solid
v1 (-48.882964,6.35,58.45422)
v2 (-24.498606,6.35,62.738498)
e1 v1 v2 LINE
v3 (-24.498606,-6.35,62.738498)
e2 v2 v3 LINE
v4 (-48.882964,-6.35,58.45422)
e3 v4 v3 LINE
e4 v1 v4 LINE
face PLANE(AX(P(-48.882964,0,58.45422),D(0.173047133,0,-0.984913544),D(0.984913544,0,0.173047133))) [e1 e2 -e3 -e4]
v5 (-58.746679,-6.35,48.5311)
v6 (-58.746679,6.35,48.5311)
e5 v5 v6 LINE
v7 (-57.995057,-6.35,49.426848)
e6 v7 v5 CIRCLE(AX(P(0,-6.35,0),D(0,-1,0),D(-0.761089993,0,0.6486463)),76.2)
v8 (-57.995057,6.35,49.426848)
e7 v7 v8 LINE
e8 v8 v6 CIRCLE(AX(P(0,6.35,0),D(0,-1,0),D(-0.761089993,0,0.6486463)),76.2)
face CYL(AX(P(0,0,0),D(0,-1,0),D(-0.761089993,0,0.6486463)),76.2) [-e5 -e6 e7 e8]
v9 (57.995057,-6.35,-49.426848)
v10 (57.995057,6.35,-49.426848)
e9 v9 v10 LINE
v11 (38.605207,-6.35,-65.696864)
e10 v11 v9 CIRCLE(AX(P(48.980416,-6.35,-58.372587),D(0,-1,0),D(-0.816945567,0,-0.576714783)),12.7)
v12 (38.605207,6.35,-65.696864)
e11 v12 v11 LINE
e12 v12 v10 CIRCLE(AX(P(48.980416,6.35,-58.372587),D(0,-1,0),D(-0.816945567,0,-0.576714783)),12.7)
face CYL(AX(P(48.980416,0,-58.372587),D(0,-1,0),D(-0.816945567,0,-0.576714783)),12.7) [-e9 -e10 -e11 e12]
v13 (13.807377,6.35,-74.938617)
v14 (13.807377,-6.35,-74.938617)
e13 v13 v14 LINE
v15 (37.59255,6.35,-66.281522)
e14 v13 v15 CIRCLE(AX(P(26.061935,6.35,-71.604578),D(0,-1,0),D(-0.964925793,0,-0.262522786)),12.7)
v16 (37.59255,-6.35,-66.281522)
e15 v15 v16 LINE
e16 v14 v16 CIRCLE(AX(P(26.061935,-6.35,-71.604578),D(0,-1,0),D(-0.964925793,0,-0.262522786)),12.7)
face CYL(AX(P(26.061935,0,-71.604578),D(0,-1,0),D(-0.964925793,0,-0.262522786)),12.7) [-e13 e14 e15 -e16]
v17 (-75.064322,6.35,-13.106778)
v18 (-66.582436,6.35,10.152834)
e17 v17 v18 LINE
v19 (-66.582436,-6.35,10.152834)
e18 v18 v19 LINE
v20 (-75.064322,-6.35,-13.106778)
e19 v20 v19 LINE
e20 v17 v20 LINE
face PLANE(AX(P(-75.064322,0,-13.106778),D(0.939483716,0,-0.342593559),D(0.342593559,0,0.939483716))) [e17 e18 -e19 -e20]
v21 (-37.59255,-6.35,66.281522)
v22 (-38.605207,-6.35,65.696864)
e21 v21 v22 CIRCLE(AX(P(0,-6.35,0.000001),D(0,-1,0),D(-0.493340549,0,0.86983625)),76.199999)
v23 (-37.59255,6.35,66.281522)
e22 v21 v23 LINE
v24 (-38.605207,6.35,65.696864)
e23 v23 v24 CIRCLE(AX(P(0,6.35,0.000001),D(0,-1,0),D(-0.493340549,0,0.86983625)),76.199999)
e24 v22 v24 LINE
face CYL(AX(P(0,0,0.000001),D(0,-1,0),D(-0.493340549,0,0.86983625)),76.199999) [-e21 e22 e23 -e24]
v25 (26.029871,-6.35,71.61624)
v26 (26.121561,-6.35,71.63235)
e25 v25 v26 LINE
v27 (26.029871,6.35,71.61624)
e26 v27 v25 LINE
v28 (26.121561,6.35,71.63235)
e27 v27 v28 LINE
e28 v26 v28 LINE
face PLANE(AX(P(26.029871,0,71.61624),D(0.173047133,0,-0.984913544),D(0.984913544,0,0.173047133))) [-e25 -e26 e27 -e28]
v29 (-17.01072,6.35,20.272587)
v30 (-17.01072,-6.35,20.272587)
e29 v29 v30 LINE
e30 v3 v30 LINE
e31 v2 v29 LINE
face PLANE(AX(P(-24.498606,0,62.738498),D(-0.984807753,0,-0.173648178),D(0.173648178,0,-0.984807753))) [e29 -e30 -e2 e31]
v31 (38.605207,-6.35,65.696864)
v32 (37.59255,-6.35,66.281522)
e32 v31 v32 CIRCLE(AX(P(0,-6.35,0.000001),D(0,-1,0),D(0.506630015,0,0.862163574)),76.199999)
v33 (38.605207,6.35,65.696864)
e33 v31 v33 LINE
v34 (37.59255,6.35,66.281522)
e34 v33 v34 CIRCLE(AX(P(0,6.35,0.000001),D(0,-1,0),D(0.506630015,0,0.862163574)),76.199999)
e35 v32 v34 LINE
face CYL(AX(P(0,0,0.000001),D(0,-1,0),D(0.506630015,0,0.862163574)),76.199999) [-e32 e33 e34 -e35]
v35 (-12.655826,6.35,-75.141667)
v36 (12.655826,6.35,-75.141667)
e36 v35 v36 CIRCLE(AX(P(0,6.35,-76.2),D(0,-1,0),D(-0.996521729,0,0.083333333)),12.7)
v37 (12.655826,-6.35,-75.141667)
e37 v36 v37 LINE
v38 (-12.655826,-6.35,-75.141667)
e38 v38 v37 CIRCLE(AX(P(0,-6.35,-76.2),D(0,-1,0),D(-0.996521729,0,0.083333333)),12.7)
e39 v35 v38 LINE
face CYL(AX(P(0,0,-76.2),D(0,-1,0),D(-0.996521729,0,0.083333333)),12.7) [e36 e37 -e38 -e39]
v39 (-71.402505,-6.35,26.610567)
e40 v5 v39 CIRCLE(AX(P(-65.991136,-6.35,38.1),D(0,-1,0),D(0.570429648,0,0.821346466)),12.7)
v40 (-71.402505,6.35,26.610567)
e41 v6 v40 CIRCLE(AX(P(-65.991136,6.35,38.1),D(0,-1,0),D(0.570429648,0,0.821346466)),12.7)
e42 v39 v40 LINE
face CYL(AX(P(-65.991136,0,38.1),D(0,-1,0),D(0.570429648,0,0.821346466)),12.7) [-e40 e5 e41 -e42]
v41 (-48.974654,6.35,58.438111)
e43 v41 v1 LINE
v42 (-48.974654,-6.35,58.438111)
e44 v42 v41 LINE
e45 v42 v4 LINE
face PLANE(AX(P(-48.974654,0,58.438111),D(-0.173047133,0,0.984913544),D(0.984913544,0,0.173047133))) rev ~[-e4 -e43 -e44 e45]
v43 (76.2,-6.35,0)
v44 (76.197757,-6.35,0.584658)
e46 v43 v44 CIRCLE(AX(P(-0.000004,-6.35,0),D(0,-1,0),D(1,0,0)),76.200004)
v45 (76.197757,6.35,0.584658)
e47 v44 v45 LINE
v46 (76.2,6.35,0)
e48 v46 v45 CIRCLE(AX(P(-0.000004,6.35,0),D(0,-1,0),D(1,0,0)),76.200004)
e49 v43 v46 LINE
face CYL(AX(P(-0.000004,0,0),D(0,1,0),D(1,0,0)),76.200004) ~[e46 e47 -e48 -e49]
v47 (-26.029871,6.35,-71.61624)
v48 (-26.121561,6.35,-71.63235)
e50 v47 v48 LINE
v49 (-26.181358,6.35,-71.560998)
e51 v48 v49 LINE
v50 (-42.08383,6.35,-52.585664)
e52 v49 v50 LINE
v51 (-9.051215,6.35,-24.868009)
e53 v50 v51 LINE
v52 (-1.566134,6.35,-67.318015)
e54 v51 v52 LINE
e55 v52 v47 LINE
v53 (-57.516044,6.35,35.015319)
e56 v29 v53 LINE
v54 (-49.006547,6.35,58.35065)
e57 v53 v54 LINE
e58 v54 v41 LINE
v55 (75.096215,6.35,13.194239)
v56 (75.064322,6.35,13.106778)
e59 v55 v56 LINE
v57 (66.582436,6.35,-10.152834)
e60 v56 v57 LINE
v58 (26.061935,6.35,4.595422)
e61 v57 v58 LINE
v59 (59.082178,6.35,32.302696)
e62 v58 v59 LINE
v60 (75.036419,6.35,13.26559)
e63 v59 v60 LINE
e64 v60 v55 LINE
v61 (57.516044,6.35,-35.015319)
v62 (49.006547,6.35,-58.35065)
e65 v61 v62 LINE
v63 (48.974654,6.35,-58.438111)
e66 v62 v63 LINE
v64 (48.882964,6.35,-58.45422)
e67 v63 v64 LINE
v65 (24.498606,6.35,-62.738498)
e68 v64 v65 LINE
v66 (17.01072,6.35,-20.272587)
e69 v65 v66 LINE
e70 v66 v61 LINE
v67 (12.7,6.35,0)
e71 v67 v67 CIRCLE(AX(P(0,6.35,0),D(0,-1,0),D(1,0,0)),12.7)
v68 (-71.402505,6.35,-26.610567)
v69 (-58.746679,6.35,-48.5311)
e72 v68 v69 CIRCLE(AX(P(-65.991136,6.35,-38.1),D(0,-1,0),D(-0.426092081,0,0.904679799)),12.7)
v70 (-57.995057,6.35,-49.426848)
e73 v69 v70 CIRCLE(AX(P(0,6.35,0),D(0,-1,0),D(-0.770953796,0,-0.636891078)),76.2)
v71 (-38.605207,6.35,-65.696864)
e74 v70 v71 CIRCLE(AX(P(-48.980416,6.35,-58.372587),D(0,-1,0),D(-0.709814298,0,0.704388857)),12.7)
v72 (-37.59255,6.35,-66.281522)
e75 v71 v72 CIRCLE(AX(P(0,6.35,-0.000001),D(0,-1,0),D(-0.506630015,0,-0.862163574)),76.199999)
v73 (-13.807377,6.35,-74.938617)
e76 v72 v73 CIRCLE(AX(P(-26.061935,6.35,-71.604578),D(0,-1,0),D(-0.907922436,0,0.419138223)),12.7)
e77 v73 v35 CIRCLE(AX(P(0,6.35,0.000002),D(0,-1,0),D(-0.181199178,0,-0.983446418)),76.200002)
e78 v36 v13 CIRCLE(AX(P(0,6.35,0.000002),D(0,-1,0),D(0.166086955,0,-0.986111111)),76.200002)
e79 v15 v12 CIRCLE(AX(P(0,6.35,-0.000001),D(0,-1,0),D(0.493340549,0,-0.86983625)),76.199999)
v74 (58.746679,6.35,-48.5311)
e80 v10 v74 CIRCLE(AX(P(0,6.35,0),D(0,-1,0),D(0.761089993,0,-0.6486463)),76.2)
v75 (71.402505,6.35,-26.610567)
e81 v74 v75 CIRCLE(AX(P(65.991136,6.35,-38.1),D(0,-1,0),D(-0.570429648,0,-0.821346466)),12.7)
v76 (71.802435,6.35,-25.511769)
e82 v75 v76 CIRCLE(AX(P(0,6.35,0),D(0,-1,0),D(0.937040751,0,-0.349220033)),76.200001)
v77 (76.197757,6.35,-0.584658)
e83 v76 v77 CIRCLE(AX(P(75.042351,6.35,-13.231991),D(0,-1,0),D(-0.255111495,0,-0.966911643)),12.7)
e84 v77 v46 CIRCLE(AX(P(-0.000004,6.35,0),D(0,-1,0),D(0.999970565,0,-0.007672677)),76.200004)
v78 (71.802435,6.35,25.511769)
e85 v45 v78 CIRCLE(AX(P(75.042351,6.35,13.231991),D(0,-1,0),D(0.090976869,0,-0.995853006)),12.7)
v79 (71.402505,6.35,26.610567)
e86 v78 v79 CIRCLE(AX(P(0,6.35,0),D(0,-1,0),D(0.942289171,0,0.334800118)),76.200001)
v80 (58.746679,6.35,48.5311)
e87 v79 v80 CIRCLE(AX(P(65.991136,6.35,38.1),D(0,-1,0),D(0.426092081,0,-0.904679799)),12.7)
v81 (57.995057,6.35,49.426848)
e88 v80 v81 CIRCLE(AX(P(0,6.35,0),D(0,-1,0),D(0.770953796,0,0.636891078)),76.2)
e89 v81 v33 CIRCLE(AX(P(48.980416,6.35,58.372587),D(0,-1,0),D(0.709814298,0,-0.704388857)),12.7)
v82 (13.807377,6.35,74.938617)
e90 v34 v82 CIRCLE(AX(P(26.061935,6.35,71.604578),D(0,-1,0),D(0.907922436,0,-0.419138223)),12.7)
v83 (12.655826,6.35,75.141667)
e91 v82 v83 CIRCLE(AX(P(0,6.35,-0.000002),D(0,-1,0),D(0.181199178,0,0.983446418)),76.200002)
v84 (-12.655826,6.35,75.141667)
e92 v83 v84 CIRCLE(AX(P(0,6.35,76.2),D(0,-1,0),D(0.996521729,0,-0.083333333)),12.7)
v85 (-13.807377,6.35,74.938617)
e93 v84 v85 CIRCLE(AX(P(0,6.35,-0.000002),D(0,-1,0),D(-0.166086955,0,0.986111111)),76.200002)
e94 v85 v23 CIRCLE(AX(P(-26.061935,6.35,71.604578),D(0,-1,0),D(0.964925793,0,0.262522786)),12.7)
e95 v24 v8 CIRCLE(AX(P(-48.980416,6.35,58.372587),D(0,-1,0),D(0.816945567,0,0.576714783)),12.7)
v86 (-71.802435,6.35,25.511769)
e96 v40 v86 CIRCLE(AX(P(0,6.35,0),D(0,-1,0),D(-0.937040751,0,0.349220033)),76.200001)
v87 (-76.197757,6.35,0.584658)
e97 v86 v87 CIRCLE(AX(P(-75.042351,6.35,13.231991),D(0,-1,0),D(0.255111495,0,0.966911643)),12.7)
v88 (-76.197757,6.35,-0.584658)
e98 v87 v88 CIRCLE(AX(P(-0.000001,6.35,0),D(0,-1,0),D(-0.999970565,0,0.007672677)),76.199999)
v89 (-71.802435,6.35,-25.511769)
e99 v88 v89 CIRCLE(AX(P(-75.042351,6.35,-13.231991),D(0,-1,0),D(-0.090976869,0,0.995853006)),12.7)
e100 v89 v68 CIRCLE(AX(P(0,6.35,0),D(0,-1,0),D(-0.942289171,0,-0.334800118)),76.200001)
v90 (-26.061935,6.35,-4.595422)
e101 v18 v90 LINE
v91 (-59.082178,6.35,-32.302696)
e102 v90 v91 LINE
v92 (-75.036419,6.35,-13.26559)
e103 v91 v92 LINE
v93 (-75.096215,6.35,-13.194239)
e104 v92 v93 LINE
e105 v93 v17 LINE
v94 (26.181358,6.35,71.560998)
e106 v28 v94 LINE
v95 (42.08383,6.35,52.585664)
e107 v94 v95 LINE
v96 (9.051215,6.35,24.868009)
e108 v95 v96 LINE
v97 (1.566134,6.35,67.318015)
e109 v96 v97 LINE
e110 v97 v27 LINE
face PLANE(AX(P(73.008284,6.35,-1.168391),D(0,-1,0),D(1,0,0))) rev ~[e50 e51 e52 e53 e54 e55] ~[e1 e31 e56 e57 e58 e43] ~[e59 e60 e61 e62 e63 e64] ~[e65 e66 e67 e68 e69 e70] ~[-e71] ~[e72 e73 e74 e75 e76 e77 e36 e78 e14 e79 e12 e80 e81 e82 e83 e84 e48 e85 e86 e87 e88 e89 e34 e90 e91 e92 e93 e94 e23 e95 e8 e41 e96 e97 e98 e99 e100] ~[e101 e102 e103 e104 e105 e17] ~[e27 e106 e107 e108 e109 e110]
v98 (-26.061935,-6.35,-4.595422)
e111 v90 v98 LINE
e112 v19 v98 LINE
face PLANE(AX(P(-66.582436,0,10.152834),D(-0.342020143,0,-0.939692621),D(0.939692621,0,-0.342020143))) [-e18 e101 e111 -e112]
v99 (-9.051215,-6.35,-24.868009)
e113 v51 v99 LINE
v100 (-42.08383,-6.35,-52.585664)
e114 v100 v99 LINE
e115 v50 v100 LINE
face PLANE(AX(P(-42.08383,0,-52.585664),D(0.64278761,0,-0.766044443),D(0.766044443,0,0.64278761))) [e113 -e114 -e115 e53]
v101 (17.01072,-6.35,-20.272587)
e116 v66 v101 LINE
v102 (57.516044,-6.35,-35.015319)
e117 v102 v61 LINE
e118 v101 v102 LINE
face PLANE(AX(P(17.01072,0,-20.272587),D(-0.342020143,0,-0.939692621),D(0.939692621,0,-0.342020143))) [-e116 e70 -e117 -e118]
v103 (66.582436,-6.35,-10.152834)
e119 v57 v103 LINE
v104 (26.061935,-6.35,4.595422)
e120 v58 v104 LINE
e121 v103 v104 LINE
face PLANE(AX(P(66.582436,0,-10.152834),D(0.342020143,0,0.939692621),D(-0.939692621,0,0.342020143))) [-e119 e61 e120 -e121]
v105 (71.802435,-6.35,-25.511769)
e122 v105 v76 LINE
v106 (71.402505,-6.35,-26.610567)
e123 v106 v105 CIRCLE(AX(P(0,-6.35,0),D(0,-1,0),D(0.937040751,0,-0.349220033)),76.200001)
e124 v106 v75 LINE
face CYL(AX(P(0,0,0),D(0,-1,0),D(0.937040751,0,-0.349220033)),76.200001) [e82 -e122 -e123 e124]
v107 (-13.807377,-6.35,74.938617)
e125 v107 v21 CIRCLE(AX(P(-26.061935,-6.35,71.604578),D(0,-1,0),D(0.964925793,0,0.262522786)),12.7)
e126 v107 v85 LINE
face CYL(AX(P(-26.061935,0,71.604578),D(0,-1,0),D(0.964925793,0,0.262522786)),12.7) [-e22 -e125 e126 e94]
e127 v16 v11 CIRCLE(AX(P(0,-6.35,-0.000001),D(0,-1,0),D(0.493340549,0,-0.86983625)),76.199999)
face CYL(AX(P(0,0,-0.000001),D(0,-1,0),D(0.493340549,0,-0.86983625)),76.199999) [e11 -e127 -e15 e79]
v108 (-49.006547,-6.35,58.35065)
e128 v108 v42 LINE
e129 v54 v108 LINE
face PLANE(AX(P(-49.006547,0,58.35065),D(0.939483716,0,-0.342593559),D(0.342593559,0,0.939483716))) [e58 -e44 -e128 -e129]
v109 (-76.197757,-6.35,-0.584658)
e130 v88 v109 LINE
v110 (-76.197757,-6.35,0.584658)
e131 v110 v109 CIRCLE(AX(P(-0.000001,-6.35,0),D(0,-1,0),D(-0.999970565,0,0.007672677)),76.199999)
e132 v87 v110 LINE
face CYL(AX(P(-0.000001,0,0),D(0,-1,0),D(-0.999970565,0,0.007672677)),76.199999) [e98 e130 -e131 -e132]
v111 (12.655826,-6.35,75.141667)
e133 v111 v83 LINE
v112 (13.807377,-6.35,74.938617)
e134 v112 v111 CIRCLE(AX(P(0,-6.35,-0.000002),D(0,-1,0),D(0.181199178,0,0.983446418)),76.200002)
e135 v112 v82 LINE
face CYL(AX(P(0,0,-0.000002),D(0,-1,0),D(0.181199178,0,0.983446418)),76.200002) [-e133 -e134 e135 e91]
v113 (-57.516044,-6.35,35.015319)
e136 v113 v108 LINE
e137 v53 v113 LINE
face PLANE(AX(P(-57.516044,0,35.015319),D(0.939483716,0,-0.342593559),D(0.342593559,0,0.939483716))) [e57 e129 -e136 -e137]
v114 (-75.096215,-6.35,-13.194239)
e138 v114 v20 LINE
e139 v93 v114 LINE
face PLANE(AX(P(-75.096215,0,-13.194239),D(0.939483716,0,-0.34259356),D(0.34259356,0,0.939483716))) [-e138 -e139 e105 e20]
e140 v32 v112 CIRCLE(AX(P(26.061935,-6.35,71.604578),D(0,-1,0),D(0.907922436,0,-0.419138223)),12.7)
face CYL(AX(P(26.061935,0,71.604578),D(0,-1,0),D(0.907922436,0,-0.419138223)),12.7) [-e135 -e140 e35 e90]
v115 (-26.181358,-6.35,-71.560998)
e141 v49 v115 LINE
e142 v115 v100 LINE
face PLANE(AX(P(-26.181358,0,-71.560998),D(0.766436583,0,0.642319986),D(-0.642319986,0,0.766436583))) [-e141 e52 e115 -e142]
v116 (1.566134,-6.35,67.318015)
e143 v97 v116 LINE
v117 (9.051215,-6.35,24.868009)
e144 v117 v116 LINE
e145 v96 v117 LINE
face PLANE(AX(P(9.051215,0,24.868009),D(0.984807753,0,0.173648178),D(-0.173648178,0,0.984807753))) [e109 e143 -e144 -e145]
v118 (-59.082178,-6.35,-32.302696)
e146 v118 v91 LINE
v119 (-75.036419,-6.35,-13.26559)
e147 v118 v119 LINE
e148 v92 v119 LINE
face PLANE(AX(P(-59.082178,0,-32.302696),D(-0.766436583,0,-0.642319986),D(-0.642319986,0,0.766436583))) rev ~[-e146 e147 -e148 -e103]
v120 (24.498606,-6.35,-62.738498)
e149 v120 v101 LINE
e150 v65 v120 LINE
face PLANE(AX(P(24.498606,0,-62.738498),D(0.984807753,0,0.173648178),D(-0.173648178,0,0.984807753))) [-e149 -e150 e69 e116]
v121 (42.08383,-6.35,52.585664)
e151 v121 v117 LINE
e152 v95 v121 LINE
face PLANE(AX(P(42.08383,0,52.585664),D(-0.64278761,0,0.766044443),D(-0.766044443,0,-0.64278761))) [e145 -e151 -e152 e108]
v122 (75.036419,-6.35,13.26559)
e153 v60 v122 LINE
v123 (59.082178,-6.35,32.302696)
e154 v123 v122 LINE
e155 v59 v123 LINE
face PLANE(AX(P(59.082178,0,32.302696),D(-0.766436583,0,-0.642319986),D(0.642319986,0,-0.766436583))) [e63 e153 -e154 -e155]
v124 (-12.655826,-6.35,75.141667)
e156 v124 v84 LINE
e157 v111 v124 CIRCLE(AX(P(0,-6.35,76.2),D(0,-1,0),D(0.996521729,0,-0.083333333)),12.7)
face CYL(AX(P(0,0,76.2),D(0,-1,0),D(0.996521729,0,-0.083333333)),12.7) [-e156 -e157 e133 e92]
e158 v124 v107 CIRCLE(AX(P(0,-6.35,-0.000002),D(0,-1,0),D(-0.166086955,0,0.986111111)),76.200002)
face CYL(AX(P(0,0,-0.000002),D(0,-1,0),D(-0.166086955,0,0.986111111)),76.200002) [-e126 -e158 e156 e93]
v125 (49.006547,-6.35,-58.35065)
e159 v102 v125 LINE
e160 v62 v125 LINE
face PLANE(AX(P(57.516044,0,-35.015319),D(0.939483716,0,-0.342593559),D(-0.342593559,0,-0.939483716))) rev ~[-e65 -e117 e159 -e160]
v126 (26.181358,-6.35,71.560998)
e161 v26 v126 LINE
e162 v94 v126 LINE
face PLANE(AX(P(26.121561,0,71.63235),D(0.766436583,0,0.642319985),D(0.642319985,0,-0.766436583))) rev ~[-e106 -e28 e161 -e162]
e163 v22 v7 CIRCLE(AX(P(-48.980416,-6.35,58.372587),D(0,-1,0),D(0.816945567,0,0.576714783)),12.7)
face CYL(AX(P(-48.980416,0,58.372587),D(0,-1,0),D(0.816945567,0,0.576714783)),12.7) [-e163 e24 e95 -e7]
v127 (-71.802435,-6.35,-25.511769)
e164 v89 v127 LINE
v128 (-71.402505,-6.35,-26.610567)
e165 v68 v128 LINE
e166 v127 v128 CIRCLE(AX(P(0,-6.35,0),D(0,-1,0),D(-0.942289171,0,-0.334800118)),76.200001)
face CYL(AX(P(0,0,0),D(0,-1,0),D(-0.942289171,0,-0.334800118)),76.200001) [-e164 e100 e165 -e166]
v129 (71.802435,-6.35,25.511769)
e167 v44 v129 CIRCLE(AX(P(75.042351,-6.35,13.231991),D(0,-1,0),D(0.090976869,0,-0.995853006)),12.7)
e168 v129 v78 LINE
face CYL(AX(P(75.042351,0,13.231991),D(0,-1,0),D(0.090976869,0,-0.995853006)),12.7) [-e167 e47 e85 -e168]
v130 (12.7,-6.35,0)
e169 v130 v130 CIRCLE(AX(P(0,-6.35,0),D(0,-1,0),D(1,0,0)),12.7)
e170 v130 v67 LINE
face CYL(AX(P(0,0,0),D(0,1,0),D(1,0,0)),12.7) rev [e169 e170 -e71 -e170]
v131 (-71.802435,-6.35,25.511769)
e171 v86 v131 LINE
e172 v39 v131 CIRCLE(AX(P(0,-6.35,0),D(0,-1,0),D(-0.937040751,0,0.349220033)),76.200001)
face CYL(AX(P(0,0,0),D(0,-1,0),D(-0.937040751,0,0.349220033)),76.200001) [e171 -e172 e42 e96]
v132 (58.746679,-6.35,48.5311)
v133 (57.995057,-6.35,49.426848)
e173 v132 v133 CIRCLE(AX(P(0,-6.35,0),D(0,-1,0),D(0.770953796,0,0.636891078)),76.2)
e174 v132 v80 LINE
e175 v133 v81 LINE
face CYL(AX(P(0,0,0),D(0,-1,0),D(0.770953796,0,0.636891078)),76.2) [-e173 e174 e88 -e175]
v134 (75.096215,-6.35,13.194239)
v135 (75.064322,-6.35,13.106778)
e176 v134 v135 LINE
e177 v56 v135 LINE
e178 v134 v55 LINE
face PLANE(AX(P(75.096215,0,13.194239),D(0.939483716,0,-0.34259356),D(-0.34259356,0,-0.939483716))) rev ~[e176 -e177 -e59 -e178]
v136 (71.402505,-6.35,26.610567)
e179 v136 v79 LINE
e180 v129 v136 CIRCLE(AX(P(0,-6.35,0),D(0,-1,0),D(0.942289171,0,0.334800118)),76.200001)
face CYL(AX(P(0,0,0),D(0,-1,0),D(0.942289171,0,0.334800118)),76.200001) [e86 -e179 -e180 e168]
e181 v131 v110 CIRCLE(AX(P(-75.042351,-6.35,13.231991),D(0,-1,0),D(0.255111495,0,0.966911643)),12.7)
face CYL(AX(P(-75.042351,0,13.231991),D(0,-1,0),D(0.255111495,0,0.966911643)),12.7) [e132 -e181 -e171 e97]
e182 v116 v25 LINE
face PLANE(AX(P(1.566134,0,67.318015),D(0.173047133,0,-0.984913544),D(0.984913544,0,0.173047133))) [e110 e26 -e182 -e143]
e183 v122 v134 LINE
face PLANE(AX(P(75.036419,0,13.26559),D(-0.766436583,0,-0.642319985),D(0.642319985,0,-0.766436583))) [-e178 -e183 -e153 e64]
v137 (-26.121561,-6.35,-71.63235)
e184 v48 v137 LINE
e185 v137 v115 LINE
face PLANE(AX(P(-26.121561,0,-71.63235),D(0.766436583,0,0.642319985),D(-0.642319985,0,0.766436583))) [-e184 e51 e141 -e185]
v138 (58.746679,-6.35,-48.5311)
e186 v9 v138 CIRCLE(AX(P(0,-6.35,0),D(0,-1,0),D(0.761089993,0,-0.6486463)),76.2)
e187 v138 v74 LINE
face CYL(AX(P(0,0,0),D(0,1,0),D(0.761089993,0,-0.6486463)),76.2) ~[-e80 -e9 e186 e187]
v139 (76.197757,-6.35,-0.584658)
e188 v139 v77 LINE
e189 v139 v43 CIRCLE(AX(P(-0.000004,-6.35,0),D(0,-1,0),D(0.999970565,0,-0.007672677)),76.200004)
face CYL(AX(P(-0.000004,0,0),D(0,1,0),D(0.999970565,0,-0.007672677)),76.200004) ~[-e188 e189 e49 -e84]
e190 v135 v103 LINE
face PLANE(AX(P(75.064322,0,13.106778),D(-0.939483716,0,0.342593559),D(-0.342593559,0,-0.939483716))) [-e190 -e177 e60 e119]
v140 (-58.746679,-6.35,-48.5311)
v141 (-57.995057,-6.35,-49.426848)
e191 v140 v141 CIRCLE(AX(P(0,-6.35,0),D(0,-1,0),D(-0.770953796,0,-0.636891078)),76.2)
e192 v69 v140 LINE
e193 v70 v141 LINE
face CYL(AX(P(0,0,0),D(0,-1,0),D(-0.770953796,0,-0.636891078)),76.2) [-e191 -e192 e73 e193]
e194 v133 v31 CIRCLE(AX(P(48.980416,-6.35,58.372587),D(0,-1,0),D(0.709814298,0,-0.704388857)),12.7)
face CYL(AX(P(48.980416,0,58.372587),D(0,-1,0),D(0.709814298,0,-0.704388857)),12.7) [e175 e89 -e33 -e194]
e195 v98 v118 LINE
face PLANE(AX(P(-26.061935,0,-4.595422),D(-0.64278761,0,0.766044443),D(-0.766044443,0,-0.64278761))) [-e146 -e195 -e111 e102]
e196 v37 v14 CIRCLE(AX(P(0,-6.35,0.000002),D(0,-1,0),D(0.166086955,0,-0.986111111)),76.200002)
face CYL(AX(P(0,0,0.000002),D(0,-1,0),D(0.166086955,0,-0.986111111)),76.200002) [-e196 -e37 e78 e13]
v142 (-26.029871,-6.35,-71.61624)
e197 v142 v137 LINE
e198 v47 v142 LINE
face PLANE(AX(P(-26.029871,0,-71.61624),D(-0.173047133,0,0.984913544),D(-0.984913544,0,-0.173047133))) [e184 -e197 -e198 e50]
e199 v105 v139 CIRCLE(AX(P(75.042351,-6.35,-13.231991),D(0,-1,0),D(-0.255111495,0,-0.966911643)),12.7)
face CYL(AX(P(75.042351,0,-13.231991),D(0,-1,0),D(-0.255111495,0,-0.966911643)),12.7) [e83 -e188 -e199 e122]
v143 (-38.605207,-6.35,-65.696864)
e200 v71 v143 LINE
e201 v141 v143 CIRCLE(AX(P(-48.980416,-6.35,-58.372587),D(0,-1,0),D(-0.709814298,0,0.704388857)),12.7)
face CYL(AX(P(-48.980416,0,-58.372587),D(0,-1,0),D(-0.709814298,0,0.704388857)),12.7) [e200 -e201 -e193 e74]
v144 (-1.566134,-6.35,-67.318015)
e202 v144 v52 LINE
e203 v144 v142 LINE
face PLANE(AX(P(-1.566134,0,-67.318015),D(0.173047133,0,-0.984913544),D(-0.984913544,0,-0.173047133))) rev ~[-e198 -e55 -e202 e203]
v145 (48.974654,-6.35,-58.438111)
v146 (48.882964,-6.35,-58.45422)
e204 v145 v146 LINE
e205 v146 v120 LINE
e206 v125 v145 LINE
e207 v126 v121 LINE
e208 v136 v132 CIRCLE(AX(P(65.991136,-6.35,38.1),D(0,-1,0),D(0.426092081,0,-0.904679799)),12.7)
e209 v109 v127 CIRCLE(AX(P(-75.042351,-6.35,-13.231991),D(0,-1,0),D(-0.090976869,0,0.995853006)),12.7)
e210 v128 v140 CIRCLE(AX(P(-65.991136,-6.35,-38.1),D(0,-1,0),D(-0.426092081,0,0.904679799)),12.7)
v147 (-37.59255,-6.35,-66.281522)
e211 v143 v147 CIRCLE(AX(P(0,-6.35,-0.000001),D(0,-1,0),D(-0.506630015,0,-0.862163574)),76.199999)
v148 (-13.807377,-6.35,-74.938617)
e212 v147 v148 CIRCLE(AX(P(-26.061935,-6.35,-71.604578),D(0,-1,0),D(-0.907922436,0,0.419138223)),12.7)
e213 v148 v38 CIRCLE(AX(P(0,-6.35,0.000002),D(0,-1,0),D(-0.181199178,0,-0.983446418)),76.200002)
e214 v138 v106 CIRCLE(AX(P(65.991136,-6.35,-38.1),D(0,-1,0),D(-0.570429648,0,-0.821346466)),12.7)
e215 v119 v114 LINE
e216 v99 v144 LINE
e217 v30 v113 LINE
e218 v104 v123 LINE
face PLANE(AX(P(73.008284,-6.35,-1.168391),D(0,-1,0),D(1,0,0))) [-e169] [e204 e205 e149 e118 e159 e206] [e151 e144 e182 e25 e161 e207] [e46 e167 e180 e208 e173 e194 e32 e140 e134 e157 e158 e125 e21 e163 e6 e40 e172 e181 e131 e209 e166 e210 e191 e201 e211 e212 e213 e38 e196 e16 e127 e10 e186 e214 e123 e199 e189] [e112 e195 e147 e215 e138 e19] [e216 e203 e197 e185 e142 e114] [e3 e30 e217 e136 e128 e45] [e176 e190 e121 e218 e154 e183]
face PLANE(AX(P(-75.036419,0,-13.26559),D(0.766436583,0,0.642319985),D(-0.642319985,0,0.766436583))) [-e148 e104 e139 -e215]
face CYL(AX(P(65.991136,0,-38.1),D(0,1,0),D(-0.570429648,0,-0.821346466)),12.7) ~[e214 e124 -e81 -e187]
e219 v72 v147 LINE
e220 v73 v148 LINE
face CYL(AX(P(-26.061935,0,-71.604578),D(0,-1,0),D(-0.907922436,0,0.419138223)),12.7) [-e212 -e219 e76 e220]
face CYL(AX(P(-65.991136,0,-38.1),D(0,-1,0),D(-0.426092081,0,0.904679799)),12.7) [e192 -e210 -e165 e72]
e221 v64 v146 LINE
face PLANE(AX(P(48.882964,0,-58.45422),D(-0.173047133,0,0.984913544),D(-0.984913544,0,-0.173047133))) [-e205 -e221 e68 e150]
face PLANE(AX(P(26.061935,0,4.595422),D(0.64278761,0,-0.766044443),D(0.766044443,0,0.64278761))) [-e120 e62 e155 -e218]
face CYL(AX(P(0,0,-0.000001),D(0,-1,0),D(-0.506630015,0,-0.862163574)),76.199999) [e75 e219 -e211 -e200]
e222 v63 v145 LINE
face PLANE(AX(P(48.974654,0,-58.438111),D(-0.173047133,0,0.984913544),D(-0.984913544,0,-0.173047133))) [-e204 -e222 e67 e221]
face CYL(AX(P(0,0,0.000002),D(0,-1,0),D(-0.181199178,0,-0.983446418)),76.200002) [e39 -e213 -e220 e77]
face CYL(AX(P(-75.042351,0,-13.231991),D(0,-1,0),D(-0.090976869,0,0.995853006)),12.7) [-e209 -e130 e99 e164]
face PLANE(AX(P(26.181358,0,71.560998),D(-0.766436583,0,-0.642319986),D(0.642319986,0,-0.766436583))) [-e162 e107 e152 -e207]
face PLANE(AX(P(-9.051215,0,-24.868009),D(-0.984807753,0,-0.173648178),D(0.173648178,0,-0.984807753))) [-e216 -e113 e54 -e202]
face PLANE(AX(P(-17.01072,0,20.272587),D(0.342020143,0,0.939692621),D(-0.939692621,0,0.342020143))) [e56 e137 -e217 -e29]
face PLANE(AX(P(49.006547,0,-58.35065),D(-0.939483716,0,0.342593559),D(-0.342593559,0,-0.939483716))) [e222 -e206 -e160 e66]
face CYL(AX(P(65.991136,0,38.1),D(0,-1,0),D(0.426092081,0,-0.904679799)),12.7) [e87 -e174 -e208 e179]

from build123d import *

# Parameters (mm, degrees)
F0_R     = 12.7
F1_DEPTH = 6.35


with BuildPart() as f1:
    # F0 (on Front) → F1 (new body, symmetric)
    with BuildSketch(Plane.XZ):
        with BuildLine():
            ThreePointArc((76.1977570212, -0.5846579641), (76.1994392532, -0.2923311333), (76.2, 0))
            ThreePointArc((76.2, 0), (76.1994392532, 0.2923311333), (76.1977570212, 0.5846579641))
            ThreePointArc((76.1977570212, 0.5846579641), (75.8897554045, 6.8691356552), (75.0643215302, 13.1067781397))
            Line((75.0643215302, 13.1067781397), (66.5824360485, -10.1528339917))
            Line((66.5824360485, -10.1528339917), (75.0423507795, -13.2319911382))
            ThreePointArc((75.0423507795, -13.2319911382), (75.8839990446, -6.9324374501), (76.1977570212, -0.5846579641))
        make_face()
        with BuildLine():
            ThreePointArc((75.0643215302, 13.1067781397), (75.8897554045, 6.8691356552), (76.1977570212, 0.5846579641))
            ThreePointArc((76.1977570212, 0.5846579641), (87.5494092428, 15.4373229946), (71.802434794, 25.5117690029))
            ThreePointArc((71.802434794, 25.5117690029), (73.6743133021, 19.4559903234), (75.0364186026, 13.2655901978))
            Line((75.0364186026, 13.2655901978), (75.0962151587, 13.1942390501))
            Line((75.0962151587, 13.1942390501), (75.0643215302, 13.1067781397))
        make_face()
        with BuildLine():
            ThreePointArc((71.802434794, -25.5117690029), (87.5494092428, -15.4373229946), (76.1977570212, -0.5846579641))
            ThreePointArc((76.1977570212, -0.5846579641), (75.8839990446, -6.9324374501), (75.0423507795, -13.2319911382))
            ThreePointArc((75.0423507795, -13.2319911382), (73.6786671882, -19.4394959134), (71.802434794, -25.5117690029))
        make_face()
        with BuildLine():
            ThreePointArc((75.0364186026, 13.2655901978), (73.6743133021, 19.4559903234), (71.802434794, 25.5117690029))
            ThreePointArc((71.802434794, 25.5117690029), (71.6045777039, 26.0619349214), (71.4025051926, 26.6105665521))
            ThreePointArc((71.4025051926, 26.6105665521), (68.9366006876, 32.4682165453), (65.9911357684, 38.1))
            Line((65.9911357684, 38.1), (59.08217806, 32.3026961351))
            Line((59.08217806, 32.3026961351), (75.0364186026, 13.2655901978))
        make_face()
        with BuildLine():
            ThreePointArc((71.802434794, -25.5117690029), (73.6786671882, -19.4394959134), (75.0423507795, -13.2319911382))
            Line((75.0423507795, -13.2319911382), (66.5824360485, -10.1528339917))
            Line((66.5824360485, -10.1528339917), (57.5160444937, -35.0153190433))
            Line((57.5160444937, -35.0153190433), (65.9911357684, -38.1))
            ThreePointArc((65.9911357684, -38.1), (68.9366006876, -32.4682165453), (71.4025051926, -26.6105665521))
            ThreePointArc((71.4025051926, -26.6105665521), (71.6045777039, -26.0619349214), (71.802434794, -25.5117690029))
        make_face()
        Polygon((57.5160444937, -35.0153190433), (66.5824360485, -10.1528339917), (26.0619349214, 4.5954222961), (59.08217806, 32.3026961351), (42.0838301815, 52.585664068), (9.0512150112, 24.8680088618), (1.5661335663, 67.3180151784), (-24.498605867, 62.7384980597), (-17.0107199103, 20.2725865657), (-57.5160444937, 35.0153190433), (-66.5824360485, 10.1528339917), (-26.0619349214, -4.5954222961), (-59.08217806, -32.3026961351), (-42.0838301815, -52.585664068), (-9.0512150112, -24.8680088618), (-1.5661335663, -67.3180151784), (24.498605867, -62.7384980597), (17.0107199103, -20.2725865657), align=None)
        Polygon((9.1694975967, 24.5029696394), (25.8049429742, 4.310466961), (16.6354453775, -20.1925026784), (-9.1694975967, -24.5029696394), (-25.8049429742, -4.310466961), (-16.6354453775, 20.1925026784), align=None, mode=Mode.SUBTRACT)
        with BuildLine():
            ThreePointArc((65.9911357684, 38.1), (68.9366006876, 32.4682165453), (71.4025051926, 26.6105665521))
            ThreePointArc((71.4025051926, 26.6105665521), (76.9896583964, 44.45), (58.7466792395, 48.5311001146))
            ThreePointArc((58.7466792395, 48.5311001146), (62.5866006876, 43.4667391734), (65.9911357684, 38.1))
        make_face()
        with BuildLine():
            ThreePointArc((58.7466792395, -48.5311001146), (76.9896583964, -44.45), (71.4025051926, -26.6105665521))
            ThreePointArc((71.4025051926, -26.6105665521), (68.9366006876, -32.4682165453), (65.9911357684, -38.1))
            ThreePointArc((65.9911357684, -38.1), (62.5866006876, -43.4667391734), (58.7466792395, -48.5311001146))
        make_face()
        with BuildLine():
            Line((42.0838301815, 52.585664068), (59.08217806, 32.3026961351))
            Line((59.08217806, 32.3026961351), (65.9911357684, 38.1))
            ThreePointArc((65.9911357684, 38.1), (62.5866006876, 43.4667391734), (58.7466792395, 48.5311001146))
            ThreePointArc((58.7466792395, 48.5311001146), (58.3725865657, 48.9804158581), (57.995057449, 49.4268480837))
            ThreePointArc((57.995057449, 49.4268480837), (53.6744308919, 54.0878495453), (48.9804158581, 58.3725865657))
            Line((48.9804158581, 58.3725865657), (42.0838301815, 52.585664068))
        make_face()
        with BuildLine():
            Line((65.9911357684, -38.1), (57.5160444937, -35.0153190433))
            Line((57.5160444937, -35.0153190433), (49.0065474088, -58.35064962))
            ThreePointArc((49.0065474088, -58.35064962), (53.6865385269, -54.0758317643), (57.995057449, -49.4268480837))
            ThreePointArc((57.995057449, -49.4268480837), (58.3725865657, -48.9804158581), (58.7466792395, -48.5311001146))
            ThreePointArc((58.7466792395, -48.5311001146), (62.5866006876, -43.4667391734), (65.9911357684, -38.1))
        make_face()
        with BuildLine():
            Line((26.1813579343, 71.5609984329), (42.0838301815, 52.585664068))
            Line((42.0838301815, 52.585664068), (48.9804158581, 58.3725865657))
            ThreePointArc((48.9804158581, 58.3725865657), (43.9456664643, 62.2512521883), (38.6052071601, 65.6968643097))
            ThreePointArc((38.6052071601, 65.6968643097), (38.1, 65.9911357684), (37.5925498612, 66.2815222738))
            ThreePointArc((37.5925498612, 66.2815222738), (31.9960317228, 69.1570238949), (26.1813579343, 71.5609984329))
        make_face()
        with BuildLine():
            ThreePointArc((57.995057449, -49.4268480837), (53.6865385269, -54.0758317643), (49.0065474088, -58.35064962))
            Line((49.0065474088, -58.35064962), (48.9746537804, -58.4381105304))
            Line((48.9746537804, -58.4381105304), (48.8829635959, -58.4542202932))
            ThreePointArc((48.8829635959, -58.4542202932), (43.8937236817, -62.2878882397), (38.6052071601, -65.6968643097))
            ThreePointArc((38.6052071601, -65.6968643097), (57.1438185011, -68.1013509933), (57.995057449, -49.4268480837))
        make_face()
        with BuildLine():
            ThreePointArc((48.9804158581, 58.3725865657), (53.6744308919, 54.0878495453), (57.995057449, 49.4268480837))
            ThreePointArc((57.995057449, 49.4268480837), (57.1438185011, 68.1013509933), (38.6052071601, 65.6968643097))
            ThreePointArc((38.6052071601, 65.6968643097), (43.9456664643, 62.2512521883), (48.9804158581, 58.3725865657))
        make_face()
        with BuildLine():
            Line((26.1215613783, 71.6323495805), (26.1813579343, 71.5609984329))
            ThreePointArc((26.1813579343, 71.5609984329), (31.9960317228, 69.1570238949), (37.5925498612, 66.2815222738))
            ThreePointArc((37.5925498612, 66.2815222738), (30.4055907417, 83.5386739879), (13.807377345, 74.9386170866))
            ThreePointArc((13.807377345, 74.9386170866), (19.9877747752, 73.5318220877), (26.0298711938, 71.6162398177))
            Line((26.0298711938, 71.6162398177), (26.1215613783, 71.6323495805))
        make_face()
        with BuildLine():
            ThreePointArc((38.6052071601, -65.6968643097), (43.8937236817, -62.2878882397), (48.8829635959, -58.4542202932))
            Line((48.8829635959, -58.4542202932), (24.498605867, -62.7384980597))
            Line((24.498605867, -62.7384980597), (26.0619349214, -71.6045777039))
            ThreePointArc((26.0619349214, -71.6045777039), (31.9383325803, -69.1836896384), (37.5925498612, -66.2815222738))
            ThreePointArc((37.5925498612, -66.2815222738), (38.1, -65.9911357684), (38.6052071601, -65.6968643097))
        make_face()
        with BuildLine():
            Line((26.0619349214, -71.6045777039), (24.498605867, -62.7384980597))
            Line((24.498605867, -62.7384980597), (-1.5661335663, -67.3180151784))
            Line((-1.5661335663, -67.3180151784), (0, -76.2))
            ThreePointArc((0, -76.2), (6.35, -75.9349557187), (12.6558259531, -75.1416666667))
            ThreePointArc((12.6558259531, -75.1416666667), (13.2319911382, -75.0423507795), (13.807377345, -74.9386170866))
            ThreePointArc((13.807377345, -74.9386170866), (20.0042362963, -73.5273454587), (26.0619349214, -71.6045777039))
        make_face()
        with BuildLine():
            Line((1.5661335663, 67.3180151784), (26.0298711938, 71.6162398177))
            ThreePointArc((26.0298711938, 71.6162398177), (19.9877747752, 73.5318220877), (13.807377345, 74.9386170866))
            ThreePointArc((13.807377345, 74.9386170866), (13.2319911382, 75.0423507795), (12.6558259531, 75.1416666667))
            ThreePointArc((12.6558259531, 75.1416666667), (6.35, 75.9349557187), (0, 76.2))
            Line((0, 76.2), (1.5661335663, 67.3180151784))
        make_face()
        with BuildLine():
            Line((-24.498605867, 62.7384980597), (1.5661335663, 67.3180151784))
            Line((1.5661335663, 67.3180151784), (0, 76.2))
            ThreePointArc((0, 76.2), (-6.35, 75.9349557187), (-12.6558259531, 75.1416666667))
            ThreePointArc((-12.6558259531, 75.1416666667), (-13.2319911382, 75.0423507795), (-13.807377345, 74.9386170866))
            ThreePointArc((-13.807377345, 74.9386170866), (-20.0042362963, 73.5273454587), (-26.0619349214, 71.6045777039))
            Line((-26.0619349214, 71.6045777039), (-24.498605867, 62.7384980597))
        make_face()
        with BuildLine():
            Line((0, -76.2), (-1.5661335663, -67.3180151784))
            Line((-1.5661335663, -67.3180151784), (-26.0298711938, -71.6162398177))
            ThreePointArc((-26.0298711938, -71.6162398177), (-19.9877747752, -73.5318220877), (-13.807377345, -74.9386170866))
            ThreePointArc((-13.807377345, -74.9386170866), (-13.2319911382, -75.0423507795), (-12.6558259531, -75.1416666667))
            ThreePointArc((-12.6558259531, -75.1416666667), (-6.35, -75.9349557187), (0, -76.2))
        make_face()
        with BuildLine():
            ThreePointArc((37.5925498612, -66.2815222738), (31.9383325803, -69.1836896384), (26.0619349214, -71.6045777039))
            ThreePointArc((26.0619349214, -71.6045777039), (20.0042362963, -73.5273454587), (13.807377345, -74.9386170866))
            ThreePointArc((13.807377345, -74.9386170866), (30.4055907417, -83.5386739879), (37.5925498612, -66.2815222738))
        make_face()
        with BuildLine():
            Line((-48.8829635959, 58.4542202932), (-24.498605867, 62.7384980597))
            Line((-24.498605867, 62.7384980597), (-26.0619349214, 71.6045777039))
            ThreePointArc((-26.0619349214, 71.6045777039), (-31.9383325803, 69.1836896384), (-37.5925498612, 66.2815222738))
            ThreePointArc((-37.5925498612, 66.2815222738), (-38.1, 65.9911357684), (-38.6052071601, 65.6968643097))
            ThreePointArc((-38.6052071601, 65.6968643097), (-43.8937236817, 62.2878882397), (-48.8829635959, 58.4542202932))
        make_face()
        with BuildLine():
            ThreePointArc((-12.6558259531, 75.1416666667), (-6.35, 75.9349557187), (0, 76.2))
            ThreePointArc((0, 76.2), (6.35, 75.9349557187), (12.6558259531, 75.1416666667))
            ThreePointArc((12.6558259531, 75.1416666667), (0, 88.9), (-12.6558259531, 75.1416666667))
        make_face()
        with BuildLine():
            ThreePointArc((-13.807377345, -74.9386170866), (-19.9877747752, -73.5318220877), (-26.0298711938, -71.6162398177))
            Line((-26.0298711938, -71.6162398177), (-26.1215613783, -71.6323495805))
            Line((-26.1215613783, -71.6323495805), (-26.1813579343, -71.5609984329))
            ThreePointArc((-26.1813579343, -71.5609984329), (-31.9960317228, -69.1570238949), (-37.5925498612, -66.2815222738))
            ThreePointArc((-37.5925498612, -66.2815222738), (-30.4055907417, -83.5386739879), (-13.807377345, -74.9386170866))
        make_face()
        with BuildLine():
            ThreePointArc((12.6558259531, -75.1416666667), (6.35, -75.9349557187), (0, -76.2))
            ThreePointArc((0, -76.2), (-6.35, -75.9349557187), (-12.6558259531, -75.1416666667))
            ThreePointArc((-12.6558259531, -75.1416666667), (0, -88.9), (12.6558259531, -75.1416666667))
        make_face()
        with BuildLine():
            Line((-48.9746537804, 58.4381105304), (-48.8829635959, 58.4542202932))
            ThreePointArc((-48.8829635959, 58.4542202932), (-43.8937236817, 62.2878882397), (-38.6052071601, 65.6968643097))
            ThreePointArc((-38.6052071601, 65.6968643097), (-57.1438185011, 68.1013509933), (-57.995057449, 49.4268480837))
            ThreePointArc((-57.995057449, 49.4268480837), (-53.6865385269, 54.0758317643), (-49.0065474088, 58.35064962))
            Line((-49.0065474088, 58.35064962), (-48.9746537804, 58.4381105304))
        make_face()
        with BuildLine():
            ThreePointArc((-37.5925498612, 66.2815222738), (-31.9383325803, 69.1836896384), (-26.0619349214, 71.6045777039))
            ThreePointArc((-26.0619349214, 71.6045777039), (-20.0042362963, 73.5273454587), (-13.807377345, 74.9386170866))
            ThreePointArc((-13.807377345, 74.9386170866), (-30.4055907417, 83.5386739879), (-37.5925498612, 66.2815222738))
        make_face()
        with BuildLine():
            ThreePointArc((-37.5925498612, -66.2815222738), (-31.9960317228, -69.1570238949), (-26.1813579343, -71.5609984329))
            Line((-26.1813579343, -71.5609984329), (-42.0838301815, -52.585664068))
            Line((-42.0838301815, -52.585664068), (-48.9804158581, -58.3725865657))
            ThreePointArc((-48.9804158581, -58.3725865657), (-43.9456664643, -62.2512521883), (-38.6052071601, -65.6968643097))
            ThreePointArc((-38.6052071601, -65.6968643097), (-38.1, -65.9911357684), (-37.5925498612, -66.2815222738))
        make_face()
        with BuildLine():
            Line((-48.9804158581, -58.3725865657), (-42.0838301815, -52.585664068))
            Line((-42.0838301815, -52.585664068), (-59.08217806, -32.3026961351))
            Line((-59.08217806, -32.3026961351), (-65.9911357684, -38.1))
            ThreePointArc((-65.9911357684, -38.1), (-62.5866006876, -43.4667391734), (-58.7466792395, -48.5311001146))
            ThreePointArc((-58.7466792395, -48.5311001146), (-58.3725865657, -48.9804158581), (-57.995057449, -49.4268480837))
            ThreePointArc((-57.995057449, -49.4268480837), (-53.6744308919, -54.0878495453), (-48.9804158581, -58.3725865657))
        make_face()
        with BuildLine():
            Line((-57.5160444937, 35.0153190433), (-49.0065474088, 58.35064962))
            ThreePointArc((-49.0065474088, 58.35064962), (-53.6865385269, 54.0758317643), (-57.995057449, 49.4268480837))
            ThreePointArc((-57.995057449, 49.4268480837), (-58.3725865657, 48.9804158581), (-58.7466792395, 48.5311001146))
            ThreePointArc((-58.7466792395, 48.5311001146), (-62.5866006876, 43.4667391734), (-65.9911357684, 38.1))
            Line((-65.9911357684, 38.1), (-57.5160444937, 35.0153190433))
        make_face()
        with BuildLine():
            Line((-66.5824360485, 10.1528339917), (-57.5160444937, 35.0153190433))
            Line((-57.5160444937, 35.0153190433), (-65.9911357684, 38.1))
            ThreePointArc((-65.9911357684, 38.1), (-68.9366006876, 32.4682165453), (-71.4025051926, 26.6105665521))
            ThreePointArc((-71.4025051926, 26.6105665521), (-71.6045777039, 26.0619349214), (-71.802434794, 25.5117690029))
            ThreePointArc((-71.802434794, 25.5117690029), (-73.6786671882, 19.4394959134), (-75.0423507795, 13.2319911382))
            Line((-75.0423507795, 13.2319911382), (-66.5824360485, 10.1528339917))
        make_face()
        with BuildLine():
            Line((-65.9911357684, -38.1), (-59.08217806, -32.3026961351))
            Line((-59.08217806, -32.3026961351), (-75.0364186026, -13.2655901978))
            ThreePointArc((-75.0364186026, -13.2655901978), (-73.6743133021, -19.4559903234), (-71.802434794, -25.5117690029))
            ThreePointArc((-71.802434794, -25.5117690029), (-71.6045777039, -26.0619349214), (-71.4025051926, -26.6105665521))
            ThreePointArc((-71.4025051926, -26.6105665521), (-68.9366006876, -32.4682165453), (-65.9911357684, -38.1))
        make_face()
        with BuildLine():
            ThreePointArc((-38.6052071601, -65.6968643097), (-43.9456664643, -62.2512521883), (-48.9804158581, -58.3725865657))
            ThreePointArc((-48.9804158581, -58.3725865657), (-53.6744308919, -54.0878495453), (-57.995057449, -49.4268480837))
            ThreePointArc((-57.995057449, -49.4268480837), (-57.1438185011, -68.1013509933), (-38.6052071601, -65.6968643097))
        make_face()
        with BuildLine():
            Line((-75.0643215302, -13.1067781397), (-66.5824360485, 10.1528339917))
            Line((-66.5824360485, 10.1528339917), (-75.0423507795, 13.2319911382))
            ThreePointArc((-75.0423507795, 13.2319911382), (-75.8839990446, 6.9324374501), (-76.1977570212, 0.5846579641))
            ThreePointArc((-76.1977570212, 0.5846579641), (-76.2, 0), (-76.1977570212, -0.5846579641))
            ThreePointArc((-76.1977570212, -0.5846579641), (-75.8897554045, -6.8691356552), (-75.0643215302, -13.1067781397))
        make_face()
        with BuildLine():
            ThreePointArc((-71.4025051926, 26.6105665521), (-68.9366006876, 32.4682165453), (-65.9911357684, 38.1))
            ThreePointArc((-65.9911357684, 38.1), (-62.5866006876, 43.4667391734), (-58.7466792395, 48.5311001146))
            ThreePointArc((-58.7466792395, 48.5311001146), (-76.9896583964, 44.45), (-71.4025051926, 26.6105665521))
        make_face()
        with BuildLine():
            ThreePointArc((-71.802434794, -25.5117690029), (-73.6743133021, -19.4559903234), (-75.0364186026, -13.2655901978))
            Line((-75.0364186026, -13.2655901978), (-75.0962151587, -13.1942390501))
            Line((-75.0962151587, -13.1942390501), (-75.0643215302, -13.1067781397))
            ThreePointArc((-75.0643215302, -13.1067781397), (-75.8897554045, -6.8691356552), (-76.1977570212, -0.5846579641))
            ThreePointArc((-76.1977570212, -0.5846579641), (-87.5494092428, -15.4373229946), (-71.802434794, -25.5117690029))
        make_face()
        with BuildLine():
            ThreePointArc((-58.7466792395, -48.5311001146), (-62.5866006876, -43.4667391734), (-65.9911357684, -38.1))
            ThreePointArc((-65.9911357684, -38.1), (-68.9366006876, -32.4682165453), (-71.4025051926, -26.6105665521))
            ThreePointArc((-71.4025051926, -26.6105665521), (-76.9896583964, -44.45), (-58.7466792395, -48.5311001146))
        make_face()
        with BuildLine():
            ThreePointArc((-76.1977570212, 0.5846579641), (-75.8839990446, 6.9324374501), (-75.0423507795, 13.2319911382))
            ThreePointArc((-75.0423507795, 13.2319911382), (-73.6786671882, 19.4394959134), (-71.802434794, 25.5117690029))
            ThreePointArc((-71.802434794, 25.5117690029), (-87.5494092428, 15.4373229946), (-76.1977570212, 0.5846579641))
        make_face()
        Polygon((16.6354453775, -20.1925026784), (25.8049429742, 4.310466961), (9.1694975967, 24.5029696394), (-16.6354453775, 20.1925026784), (-25.8049429742, -4.310466961), (-9.1694975967, -24.5029696394), align=None)
        Circle(F0_R, mode=Mode.SUBTRACT)
    extrude(amount=F1_DEPTH, both=True)


solid = f1.part
